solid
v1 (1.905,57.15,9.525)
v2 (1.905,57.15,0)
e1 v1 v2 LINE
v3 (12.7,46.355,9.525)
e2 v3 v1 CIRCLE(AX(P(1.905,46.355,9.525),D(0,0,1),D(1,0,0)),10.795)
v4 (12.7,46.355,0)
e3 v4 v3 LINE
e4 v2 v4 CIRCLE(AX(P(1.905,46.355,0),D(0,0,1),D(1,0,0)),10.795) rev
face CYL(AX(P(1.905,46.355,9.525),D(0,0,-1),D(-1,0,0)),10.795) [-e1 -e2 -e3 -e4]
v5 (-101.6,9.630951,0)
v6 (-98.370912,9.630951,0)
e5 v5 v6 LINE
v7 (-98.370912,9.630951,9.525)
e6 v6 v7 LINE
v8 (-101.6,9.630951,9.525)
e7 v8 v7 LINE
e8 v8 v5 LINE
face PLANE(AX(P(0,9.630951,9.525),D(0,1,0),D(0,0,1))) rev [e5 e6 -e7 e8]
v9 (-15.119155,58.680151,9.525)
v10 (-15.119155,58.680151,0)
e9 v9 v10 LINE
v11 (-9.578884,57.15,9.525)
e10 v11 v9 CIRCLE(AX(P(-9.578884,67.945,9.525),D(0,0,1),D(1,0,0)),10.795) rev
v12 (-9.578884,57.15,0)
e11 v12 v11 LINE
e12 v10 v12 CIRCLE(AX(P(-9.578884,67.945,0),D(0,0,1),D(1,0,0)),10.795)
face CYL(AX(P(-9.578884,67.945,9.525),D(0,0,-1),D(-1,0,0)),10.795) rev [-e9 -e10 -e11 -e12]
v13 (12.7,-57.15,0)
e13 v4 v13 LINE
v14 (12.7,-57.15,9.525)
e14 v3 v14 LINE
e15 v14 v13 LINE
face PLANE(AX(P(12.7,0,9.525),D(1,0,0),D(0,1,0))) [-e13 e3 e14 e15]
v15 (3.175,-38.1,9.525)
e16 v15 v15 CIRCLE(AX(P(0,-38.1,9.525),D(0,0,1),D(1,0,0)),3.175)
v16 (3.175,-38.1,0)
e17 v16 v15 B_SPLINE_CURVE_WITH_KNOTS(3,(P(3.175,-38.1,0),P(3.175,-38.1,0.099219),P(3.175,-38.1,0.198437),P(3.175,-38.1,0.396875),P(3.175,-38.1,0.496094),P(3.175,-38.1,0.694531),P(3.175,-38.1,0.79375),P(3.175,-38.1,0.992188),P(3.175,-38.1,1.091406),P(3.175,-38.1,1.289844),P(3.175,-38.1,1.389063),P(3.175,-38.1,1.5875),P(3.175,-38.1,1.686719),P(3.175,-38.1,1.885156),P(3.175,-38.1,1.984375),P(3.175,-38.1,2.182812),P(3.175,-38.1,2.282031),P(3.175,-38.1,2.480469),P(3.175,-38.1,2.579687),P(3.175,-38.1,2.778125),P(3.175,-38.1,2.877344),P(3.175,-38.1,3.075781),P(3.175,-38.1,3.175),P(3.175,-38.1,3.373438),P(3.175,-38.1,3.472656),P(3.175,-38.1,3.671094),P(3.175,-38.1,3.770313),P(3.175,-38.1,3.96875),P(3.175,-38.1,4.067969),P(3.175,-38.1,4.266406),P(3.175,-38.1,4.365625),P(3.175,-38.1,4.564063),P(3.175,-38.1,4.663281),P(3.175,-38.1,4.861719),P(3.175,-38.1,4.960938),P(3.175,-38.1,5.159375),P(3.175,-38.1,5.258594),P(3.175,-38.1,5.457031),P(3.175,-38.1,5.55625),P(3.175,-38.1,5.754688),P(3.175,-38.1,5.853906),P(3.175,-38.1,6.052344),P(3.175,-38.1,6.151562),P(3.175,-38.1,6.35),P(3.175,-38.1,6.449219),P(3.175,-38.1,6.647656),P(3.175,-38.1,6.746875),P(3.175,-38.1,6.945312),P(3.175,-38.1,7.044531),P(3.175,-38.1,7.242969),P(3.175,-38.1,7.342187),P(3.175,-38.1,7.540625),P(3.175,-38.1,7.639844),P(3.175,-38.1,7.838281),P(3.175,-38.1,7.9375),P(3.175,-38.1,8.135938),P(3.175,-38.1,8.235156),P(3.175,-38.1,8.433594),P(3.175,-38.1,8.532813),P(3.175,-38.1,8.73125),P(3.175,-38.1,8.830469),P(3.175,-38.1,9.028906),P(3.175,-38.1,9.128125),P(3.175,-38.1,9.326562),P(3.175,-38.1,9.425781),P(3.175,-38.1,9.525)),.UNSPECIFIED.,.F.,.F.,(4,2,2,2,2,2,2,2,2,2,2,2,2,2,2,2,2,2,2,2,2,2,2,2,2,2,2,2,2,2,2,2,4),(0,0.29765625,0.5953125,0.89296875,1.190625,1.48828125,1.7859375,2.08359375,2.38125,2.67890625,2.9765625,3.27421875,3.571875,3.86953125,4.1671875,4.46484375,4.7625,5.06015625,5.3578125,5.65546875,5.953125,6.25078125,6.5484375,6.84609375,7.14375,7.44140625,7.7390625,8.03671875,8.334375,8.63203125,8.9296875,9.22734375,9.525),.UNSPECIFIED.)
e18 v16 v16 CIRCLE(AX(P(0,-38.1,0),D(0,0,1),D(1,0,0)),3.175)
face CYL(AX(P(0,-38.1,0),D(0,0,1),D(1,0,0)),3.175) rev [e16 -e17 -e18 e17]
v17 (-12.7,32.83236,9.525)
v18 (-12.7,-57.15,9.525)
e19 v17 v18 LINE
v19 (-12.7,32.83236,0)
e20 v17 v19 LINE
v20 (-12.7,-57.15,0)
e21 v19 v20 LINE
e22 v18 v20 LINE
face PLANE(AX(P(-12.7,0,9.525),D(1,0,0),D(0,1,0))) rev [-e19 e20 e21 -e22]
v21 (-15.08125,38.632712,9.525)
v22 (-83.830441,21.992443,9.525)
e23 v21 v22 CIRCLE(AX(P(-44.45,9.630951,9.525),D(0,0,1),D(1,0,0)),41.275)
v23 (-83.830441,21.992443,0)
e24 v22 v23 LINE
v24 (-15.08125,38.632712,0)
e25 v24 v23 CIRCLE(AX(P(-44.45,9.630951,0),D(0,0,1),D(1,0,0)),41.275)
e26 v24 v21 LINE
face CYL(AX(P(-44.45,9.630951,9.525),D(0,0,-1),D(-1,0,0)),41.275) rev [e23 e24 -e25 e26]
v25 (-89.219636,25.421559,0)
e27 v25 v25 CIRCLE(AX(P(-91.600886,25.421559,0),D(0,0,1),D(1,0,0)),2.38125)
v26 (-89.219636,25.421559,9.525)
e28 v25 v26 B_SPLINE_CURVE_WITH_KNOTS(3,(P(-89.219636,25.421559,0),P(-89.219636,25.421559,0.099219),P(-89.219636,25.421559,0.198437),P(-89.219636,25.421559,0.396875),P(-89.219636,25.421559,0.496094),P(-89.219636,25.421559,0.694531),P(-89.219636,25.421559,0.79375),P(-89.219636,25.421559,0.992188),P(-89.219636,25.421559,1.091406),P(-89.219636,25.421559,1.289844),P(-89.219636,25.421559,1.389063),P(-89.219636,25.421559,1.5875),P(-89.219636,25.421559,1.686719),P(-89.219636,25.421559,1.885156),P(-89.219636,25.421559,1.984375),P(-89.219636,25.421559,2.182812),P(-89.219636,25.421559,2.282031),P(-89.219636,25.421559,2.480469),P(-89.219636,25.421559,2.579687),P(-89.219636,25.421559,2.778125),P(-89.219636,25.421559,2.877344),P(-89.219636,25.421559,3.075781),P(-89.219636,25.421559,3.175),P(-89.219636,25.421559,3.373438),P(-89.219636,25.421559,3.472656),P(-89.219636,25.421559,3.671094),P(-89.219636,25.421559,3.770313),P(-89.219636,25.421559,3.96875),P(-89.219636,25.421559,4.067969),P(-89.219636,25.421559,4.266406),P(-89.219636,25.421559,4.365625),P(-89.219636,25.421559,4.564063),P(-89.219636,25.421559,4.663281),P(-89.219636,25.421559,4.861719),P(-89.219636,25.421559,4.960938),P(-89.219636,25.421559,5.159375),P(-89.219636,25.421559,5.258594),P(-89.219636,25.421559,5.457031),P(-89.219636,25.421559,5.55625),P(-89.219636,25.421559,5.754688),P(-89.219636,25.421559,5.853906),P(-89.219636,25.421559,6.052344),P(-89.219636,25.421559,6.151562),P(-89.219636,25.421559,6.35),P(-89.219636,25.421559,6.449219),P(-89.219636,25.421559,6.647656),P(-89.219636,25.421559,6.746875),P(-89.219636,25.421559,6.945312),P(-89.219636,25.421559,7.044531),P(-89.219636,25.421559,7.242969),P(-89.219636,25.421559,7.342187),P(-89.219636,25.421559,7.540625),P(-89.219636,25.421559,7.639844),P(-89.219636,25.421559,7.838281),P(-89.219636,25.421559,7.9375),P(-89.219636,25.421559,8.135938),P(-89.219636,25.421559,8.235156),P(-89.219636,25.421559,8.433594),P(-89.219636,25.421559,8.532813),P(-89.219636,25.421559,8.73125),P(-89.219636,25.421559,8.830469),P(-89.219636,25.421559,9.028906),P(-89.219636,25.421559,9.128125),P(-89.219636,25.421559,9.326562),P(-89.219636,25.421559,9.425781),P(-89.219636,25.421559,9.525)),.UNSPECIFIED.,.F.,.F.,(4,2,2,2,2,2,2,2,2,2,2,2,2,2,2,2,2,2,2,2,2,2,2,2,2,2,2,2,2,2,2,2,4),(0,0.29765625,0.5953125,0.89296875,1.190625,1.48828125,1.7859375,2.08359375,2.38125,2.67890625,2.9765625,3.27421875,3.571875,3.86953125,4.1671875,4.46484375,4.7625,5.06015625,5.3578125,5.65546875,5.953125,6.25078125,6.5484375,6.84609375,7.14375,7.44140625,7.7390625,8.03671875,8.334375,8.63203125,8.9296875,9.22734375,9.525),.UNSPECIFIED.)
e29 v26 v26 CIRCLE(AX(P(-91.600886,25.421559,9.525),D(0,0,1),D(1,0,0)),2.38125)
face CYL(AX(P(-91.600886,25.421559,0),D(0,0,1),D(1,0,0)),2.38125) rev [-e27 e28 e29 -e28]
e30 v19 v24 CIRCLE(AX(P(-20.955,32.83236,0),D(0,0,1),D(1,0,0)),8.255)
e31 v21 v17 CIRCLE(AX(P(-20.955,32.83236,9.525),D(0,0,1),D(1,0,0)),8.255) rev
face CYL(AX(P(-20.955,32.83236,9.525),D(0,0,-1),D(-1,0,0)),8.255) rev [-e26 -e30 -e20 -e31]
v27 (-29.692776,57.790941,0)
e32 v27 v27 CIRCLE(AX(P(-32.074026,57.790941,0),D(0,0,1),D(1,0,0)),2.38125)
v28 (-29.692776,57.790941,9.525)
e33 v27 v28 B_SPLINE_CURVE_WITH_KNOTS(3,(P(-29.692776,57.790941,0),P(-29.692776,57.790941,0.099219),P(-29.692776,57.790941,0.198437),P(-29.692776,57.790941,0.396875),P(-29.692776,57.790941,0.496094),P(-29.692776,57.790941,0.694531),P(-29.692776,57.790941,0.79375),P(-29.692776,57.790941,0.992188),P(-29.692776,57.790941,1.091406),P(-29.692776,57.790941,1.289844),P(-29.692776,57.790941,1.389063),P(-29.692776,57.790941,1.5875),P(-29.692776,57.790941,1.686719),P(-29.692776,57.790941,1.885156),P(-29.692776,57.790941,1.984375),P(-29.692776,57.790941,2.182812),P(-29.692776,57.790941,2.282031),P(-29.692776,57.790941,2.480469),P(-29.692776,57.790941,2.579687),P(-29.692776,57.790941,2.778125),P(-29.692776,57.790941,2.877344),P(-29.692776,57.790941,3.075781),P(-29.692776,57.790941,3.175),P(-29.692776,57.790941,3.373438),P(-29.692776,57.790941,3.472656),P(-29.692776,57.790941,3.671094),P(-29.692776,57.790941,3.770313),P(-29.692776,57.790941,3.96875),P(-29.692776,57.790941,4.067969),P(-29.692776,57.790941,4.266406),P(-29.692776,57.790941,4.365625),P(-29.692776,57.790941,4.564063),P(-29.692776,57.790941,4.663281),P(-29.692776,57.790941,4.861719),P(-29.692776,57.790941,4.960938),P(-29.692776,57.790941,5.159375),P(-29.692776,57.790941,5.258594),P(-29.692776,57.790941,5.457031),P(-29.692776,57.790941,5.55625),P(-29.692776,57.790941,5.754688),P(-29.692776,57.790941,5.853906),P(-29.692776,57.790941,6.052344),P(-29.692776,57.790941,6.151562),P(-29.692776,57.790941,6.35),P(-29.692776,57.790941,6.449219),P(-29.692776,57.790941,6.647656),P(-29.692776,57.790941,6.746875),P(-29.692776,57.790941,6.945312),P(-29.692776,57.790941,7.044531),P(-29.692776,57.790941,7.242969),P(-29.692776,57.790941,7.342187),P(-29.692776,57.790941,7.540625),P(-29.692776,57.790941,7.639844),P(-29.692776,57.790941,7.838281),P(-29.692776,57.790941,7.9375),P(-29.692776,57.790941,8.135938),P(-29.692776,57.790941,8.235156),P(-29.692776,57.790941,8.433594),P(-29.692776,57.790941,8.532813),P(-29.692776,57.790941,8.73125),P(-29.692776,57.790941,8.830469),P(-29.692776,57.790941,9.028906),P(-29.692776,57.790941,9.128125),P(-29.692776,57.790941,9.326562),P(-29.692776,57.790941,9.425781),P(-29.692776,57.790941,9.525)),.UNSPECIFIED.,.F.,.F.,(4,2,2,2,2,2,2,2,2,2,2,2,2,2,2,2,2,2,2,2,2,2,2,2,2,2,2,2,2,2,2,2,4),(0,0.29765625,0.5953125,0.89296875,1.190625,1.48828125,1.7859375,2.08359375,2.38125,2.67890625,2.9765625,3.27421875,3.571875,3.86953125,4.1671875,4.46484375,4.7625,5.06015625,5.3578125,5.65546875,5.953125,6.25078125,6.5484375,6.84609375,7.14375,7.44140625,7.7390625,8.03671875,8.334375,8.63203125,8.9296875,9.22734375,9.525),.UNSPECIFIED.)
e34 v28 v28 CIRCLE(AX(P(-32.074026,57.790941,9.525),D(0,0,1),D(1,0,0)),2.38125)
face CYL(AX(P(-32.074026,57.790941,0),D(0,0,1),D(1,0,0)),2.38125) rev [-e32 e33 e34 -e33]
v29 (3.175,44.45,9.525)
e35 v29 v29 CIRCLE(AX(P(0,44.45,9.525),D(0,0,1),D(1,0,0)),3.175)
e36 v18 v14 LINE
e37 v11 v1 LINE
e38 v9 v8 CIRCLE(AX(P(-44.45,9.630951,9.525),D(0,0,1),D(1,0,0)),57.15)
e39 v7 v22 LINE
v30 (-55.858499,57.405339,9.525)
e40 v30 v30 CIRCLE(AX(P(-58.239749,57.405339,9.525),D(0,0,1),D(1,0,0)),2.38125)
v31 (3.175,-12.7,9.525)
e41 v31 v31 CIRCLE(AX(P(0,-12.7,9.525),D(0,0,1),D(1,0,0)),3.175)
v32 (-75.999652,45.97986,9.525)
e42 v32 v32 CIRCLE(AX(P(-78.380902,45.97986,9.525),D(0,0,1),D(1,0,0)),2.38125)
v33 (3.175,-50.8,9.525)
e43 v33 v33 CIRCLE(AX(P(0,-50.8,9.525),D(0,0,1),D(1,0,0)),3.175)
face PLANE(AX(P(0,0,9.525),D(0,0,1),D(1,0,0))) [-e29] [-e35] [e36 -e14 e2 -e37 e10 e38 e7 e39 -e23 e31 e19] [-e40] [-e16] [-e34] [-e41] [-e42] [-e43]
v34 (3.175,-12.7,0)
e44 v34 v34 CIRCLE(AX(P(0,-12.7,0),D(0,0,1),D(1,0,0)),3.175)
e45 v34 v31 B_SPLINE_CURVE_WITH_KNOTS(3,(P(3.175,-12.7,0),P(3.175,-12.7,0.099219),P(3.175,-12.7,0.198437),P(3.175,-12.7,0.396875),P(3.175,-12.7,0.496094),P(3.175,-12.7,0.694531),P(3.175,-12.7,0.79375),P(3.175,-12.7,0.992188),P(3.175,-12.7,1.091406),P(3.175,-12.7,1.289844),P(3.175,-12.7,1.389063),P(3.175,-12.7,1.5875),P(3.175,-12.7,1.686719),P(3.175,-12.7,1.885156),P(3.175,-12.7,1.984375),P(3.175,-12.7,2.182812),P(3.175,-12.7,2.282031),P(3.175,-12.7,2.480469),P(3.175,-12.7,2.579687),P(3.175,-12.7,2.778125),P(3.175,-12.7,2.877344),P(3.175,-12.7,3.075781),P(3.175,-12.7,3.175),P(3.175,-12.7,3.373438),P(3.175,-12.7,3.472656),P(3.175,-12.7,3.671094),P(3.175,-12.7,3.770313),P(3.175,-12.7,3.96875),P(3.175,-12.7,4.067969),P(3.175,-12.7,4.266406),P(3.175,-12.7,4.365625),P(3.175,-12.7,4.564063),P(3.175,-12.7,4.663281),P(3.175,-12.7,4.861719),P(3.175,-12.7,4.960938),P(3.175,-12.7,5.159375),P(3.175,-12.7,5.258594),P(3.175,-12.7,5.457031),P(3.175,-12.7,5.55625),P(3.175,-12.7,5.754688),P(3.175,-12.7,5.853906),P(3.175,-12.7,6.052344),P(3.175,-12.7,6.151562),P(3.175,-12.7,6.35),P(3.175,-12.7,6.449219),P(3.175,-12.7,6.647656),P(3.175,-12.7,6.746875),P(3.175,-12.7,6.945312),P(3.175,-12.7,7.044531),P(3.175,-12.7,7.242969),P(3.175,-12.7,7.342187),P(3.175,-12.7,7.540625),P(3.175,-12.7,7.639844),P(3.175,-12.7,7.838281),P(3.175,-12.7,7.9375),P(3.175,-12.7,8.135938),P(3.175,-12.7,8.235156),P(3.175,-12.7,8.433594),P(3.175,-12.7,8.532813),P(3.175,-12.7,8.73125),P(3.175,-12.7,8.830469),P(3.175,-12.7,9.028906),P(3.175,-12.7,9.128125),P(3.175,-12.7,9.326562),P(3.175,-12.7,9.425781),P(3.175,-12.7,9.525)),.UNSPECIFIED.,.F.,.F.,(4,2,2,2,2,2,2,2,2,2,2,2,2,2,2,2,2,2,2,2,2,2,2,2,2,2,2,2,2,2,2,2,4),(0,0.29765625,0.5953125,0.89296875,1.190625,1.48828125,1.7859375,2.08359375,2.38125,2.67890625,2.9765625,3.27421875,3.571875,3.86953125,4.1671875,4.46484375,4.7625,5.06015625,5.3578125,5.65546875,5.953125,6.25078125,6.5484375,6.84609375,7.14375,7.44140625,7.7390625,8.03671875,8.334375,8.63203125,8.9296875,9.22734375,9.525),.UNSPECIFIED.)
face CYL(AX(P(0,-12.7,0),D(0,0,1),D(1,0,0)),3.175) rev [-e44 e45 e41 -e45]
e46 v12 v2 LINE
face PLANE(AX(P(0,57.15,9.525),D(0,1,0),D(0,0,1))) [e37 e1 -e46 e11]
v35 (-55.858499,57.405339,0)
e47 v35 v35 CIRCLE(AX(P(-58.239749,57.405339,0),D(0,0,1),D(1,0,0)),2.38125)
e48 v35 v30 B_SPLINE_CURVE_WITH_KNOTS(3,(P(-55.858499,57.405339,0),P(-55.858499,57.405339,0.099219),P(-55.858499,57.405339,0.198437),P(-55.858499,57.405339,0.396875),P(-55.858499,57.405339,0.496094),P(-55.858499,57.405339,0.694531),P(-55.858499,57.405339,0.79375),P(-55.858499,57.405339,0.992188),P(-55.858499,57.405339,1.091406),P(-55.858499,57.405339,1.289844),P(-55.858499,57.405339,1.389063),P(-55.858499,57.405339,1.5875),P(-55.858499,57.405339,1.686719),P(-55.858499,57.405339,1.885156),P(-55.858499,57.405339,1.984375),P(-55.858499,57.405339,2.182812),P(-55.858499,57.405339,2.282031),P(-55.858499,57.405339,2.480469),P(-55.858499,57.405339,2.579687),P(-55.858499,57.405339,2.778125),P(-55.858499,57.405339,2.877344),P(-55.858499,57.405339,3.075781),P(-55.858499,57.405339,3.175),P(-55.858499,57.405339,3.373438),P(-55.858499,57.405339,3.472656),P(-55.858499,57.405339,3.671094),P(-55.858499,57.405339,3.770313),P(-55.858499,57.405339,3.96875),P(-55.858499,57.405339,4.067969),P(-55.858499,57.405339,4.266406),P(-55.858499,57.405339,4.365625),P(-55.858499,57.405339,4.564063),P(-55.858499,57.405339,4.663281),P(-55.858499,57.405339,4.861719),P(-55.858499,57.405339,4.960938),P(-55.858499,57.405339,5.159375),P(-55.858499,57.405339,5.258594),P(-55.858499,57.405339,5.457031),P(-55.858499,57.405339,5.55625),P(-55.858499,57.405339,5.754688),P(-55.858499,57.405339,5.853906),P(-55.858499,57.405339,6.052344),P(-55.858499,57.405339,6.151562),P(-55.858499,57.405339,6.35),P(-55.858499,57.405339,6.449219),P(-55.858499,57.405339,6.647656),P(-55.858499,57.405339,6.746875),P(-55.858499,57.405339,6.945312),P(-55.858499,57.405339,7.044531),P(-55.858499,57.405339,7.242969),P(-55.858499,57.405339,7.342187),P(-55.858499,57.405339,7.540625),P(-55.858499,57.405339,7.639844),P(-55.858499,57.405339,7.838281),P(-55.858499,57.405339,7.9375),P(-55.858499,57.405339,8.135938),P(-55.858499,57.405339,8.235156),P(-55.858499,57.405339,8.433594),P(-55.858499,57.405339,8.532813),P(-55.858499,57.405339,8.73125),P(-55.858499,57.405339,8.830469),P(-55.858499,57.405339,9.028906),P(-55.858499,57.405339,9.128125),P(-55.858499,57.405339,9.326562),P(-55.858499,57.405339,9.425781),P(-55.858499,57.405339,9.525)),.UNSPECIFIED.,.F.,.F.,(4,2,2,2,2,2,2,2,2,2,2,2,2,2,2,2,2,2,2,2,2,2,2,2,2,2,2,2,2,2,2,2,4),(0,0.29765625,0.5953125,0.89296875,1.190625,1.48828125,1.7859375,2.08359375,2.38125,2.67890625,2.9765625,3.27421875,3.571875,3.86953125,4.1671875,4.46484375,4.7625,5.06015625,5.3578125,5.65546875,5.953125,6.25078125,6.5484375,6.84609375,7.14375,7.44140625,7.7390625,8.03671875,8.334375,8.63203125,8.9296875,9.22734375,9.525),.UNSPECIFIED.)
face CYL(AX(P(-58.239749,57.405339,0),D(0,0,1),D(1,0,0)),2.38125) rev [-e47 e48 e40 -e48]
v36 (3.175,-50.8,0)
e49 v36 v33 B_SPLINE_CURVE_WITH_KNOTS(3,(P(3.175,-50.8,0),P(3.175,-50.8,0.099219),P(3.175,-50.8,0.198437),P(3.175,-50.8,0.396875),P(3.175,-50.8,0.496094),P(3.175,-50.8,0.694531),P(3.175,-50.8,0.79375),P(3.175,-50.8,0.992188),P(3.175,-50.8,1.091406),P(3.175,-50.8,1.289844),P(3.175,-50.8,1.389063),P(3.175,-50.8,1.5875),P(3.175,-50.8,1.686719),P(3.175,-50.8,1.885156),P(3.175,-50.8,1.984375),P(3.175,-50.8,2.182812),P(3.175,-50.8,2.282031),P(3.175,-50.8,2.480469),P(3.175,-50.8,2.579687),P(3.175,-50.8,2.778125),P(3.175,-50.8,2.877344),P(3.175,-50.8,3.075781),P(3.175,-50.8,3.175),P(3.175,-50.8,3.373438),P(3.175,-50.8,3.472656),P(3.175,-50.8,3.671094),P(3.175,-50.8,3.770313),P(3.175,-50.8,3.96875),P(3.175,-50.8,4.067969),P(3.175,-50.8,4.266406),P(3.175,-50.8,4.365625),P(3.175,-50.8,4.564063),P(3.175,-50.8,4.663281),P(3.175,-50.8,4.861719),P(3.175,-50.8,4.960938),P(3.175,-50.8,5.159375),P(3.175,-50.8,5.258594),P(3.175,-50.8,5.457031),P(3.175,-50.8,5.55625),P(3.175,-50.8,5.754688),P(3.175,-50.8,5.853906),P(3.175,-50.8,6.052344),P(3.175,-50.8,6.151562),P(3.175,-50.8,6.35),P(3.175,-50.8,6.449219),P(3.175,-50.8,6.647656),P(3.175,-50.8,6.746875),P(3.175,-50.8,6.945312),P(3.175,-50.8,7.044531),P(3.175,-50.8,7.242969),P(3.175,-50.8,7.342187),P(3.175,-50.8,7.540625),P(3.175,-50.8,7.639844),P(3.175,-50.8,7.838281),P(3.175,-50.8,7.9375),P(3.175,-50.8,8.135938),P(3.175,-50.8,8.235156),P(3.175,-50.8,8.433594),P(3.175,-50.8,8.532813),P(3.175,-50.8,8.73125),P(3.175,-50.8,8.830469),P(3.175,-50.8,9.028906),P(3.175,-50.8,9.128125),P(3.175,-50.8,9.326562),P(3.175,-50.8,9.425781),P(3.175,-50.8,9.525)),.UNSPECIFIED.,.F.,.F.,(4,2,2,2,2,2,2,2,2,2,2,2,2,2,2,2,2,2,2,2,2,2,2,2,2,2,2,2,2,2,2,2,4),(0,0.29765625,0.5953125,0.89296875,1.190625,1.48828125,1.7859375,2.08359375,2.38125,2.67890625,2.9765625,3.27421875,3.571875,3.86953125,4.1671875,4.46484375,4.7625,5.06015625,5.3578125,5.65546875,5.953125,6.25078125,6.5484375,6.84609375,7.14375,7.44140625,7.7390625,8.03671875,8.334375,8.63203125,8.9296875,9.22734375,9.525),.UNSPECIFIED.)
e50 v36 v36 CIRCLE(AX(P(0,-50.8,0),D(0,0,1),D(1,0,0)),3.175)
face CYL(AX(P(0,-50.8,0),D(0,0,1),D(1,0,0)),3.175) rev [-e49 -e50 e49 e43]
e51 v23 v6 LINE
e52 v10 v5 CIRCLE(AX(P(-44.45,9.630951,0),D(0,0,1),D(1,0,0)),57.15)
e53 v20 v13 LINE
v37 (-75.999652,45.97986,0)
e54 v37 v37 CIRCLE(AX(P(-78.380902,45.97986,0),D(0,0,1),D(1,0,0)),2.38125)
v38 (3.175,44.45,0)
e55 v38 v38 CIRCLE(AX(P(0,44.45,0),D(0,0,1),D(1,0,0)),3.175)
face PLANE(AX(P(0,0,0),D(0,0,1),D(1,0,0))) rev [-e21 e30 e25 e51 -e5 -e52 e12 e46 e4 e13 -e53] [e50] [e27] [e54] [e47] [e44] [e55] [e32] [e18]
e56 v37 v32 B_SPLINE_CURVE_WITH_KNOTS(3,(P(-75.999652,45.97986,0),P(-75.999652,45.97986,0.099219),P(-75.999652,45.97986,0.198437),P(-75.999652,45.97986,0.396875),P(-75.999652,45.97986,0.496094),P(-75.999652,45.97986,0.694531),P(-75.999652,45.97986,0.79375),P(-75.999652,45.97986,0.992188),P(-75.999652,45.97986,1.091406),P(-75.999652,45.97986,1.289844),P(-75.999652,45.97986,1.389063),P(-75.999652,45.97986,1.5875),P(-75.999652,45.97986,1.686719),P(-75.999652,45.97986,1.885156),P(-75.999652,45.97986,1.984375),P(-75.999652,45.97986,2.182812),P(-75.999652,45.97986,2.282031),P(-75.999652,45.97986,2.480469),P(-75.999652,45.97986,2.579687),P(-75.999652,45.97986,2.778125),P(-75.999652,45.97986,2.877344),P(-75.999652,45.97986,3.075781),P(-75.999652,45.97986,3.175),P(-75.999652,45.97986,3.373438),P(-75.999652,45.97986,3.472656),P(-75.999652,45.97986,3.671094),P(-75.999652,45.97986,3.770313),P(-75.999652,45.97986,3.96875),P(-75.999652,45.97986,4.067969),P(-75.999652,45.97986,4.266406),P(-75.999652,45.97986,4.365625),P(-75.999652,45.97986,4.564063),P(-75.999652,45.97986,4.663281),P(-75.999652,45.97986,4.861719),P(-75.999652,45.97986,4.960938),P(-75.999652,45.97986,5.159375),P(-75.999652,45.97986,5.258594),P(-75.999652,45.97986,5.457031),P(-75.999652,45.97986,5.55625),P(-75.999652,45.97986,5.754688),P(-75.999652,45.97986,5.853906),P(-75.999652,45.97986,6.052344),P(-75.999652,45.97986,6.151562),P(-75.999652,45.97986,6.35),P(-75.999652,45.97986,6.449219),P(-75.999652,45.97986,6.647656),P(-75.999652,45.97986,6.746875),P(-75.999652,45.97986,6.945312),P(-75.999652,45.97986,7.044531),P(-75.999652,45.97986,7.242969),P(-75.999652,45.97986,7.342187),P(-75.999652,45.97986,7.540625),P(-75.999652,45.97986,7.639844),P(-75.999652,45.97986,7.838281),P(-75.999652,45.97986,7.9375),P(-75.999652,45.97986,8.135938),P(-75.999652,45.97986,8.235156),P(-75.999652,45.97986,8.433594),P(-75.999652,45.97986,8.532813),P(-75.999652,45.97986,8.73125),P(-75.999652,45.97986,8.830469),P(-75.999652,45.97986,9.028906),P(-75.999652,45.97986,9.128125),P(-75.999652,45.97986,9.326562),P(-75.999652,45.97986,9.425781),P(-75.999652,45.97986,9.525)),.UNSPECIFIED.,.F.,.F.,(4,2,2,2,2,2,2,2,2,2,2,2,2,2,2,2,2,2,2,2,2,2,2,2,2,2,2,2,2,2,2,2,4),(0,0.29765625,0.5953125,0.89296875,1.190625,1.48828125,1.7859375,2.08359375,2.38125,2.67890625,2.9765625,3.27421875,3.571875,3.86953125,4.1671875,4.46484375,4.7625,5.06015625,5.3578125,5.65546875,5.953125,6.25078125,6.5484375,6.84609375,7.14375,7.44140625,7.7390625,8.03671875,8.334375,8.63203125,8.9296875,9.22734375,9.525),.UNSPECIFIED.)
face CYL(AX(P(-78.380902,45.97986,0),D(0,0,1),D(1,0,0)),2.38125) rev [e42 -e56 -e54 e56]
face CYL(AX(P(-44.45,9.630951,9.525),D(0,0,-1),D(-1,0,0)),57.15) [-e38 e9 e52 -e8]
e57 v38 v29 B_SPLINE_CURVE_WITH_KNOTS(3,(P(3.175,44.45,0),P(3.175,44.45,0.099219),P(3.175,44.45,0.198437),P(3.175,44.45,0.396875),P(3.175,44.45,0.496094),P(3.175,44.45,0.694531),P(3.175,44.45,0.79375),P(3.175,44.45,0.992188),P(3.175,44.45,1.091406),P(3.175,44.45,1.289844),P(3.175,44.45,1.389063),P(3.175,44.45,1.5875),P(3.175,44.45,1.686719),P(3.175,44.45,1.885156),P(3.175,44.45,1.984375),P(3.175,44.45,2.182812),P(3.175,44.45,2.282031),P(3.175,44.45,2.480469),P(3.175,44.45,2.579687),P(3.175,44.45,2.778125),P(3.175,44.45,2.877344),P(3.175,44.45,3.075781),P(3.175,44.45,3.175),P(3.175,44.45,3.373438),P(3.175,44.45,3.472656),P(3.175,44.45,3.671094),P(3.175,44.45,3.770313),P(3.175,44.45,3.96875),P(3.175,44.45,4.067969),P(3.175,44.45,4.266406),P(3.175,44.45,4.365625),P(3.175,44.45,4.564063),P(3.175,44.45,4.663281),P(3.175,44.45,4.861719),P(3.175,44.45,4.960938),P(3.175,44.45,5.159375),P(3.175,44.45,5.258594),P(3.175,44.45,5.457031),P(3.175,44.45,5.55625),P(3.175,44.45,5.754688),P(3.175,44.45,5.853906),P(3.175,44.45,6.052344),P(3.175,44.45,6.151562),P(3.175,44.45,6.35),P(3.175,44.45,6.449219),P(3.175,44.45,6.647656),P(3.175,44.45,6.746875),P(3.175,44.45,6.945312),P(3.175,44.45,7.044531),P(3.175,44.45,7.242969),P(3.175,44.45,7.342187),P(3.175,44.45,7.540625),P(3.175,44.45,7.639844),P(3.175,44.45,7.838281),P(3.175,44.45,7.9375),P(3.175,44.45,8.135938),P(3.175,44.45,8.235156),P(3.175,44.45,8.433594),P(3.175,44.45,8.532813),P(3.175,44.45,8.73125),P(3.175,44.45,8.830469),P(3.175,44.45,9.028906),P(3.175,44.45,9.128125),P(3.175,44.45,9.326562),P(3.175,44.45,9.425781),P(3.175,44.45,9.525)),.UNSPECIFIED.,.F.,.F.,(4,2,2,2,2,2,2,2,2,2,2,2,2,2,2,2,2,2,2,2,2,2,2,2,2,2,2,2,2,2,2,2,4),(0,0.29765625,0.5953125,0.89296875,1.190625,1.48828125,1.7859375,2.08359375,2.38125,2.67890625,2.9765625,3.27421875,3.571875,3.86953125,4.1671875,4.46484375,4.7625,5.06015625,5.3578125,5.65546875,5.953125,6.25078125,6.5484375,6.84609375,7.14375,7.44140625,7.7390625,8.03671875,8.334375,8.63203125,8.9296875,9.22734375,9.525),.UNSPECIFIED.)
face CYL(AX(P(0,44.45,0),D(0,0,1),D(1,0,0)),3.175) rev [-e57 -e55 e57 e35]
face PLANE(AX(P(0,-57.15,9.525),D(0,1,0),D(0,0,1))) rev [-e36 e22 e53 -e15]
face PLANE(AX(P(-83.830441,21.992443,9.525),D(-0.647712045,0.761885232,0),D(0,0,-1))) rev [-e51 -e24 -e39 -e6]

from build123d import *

# Parameters (mm, degrees)
BOSS_EXTRUDE1_DEPTH = 9.525
FILLET1_R           = 8.255
FILLET3_R           = 10.795
SKETCH2_R           = 3.175
CUT_EXTRUDE1_DEPTH  = 122.954832076
SKETCH3_R           = 3.175
SKETCH3_R_2         = 2.38125
CUT_EXTRUDE2_DEPTH  = 122.954832076


with BuildPart() as part:
    # Sketch1 → Boss-Extrude1 (new body)
    with BuildSketch(Plane.XY):
        with BuildLine():
            Line((12.7, 57.15), (-12.7, 57.15))
            ThreePointArc((-12.7, 57.15), (-71.390768363, 60.032513664), (-101.6, 9.630951188))
            Line((-101.6, 9.630951188), (-85.725, 9.630951188))
            ThreePointArc((-85.725, 9.630951188), (-58.470420375, 48.45173734), (-12.7, 36.004481953))
            Line((-12.7, 36.004481953), (-12.7, -57.15))
            Line((-12.7, -57.15), (12.7, -57.15))
            Line((12.7, -57.15), (12.7, 57.15))
        make_face()
    extrude(amount=BOSS_EXTRUDE1_DEPTH)

    # Fillet1
    fillet1_edges = [part.edges().sort_by_distance(p)[0] for p in [
        (-12.7, 36.004481953, 4.7625),
    ]]
    fillet(fillet1_edges, radius=FILLET1_R)

    # Chamfer1
    # the kernel refuses this chamfer: 16.925734726, 15.24 mm, written as the material it takes off along each edge
    with BuildSketch(Plane(origin=(-85.725, 9.630951188, -32.922584323), x_dir=(0.18505799374320953, 0.982727601602671, 0), z_dir=(0, 0, 1))) as chamfer1_piece_1:
        with BuildLine():
            Line((13.024984464, 0), (-2.866629235, 12.853244189))
            Line((-2.866629235, 12.853244189), (-3.199296969, 12.790599339))
            ThreePointArc((-3.199296969, 12.790599339), (-1.550509453, 6.404553068), (-0.332667734, -0.06264485))
            Line((-0.332667734, -0.06264485), (0.06264485, -0.332667734))
            ThreePointArc((0.06264485, -0.332667734), (6.502538231, 0.358645822), (12.985122864, -0.336159562))
            Line((12.985122864, -0.336159562), (13.024984464, 0))
        make_face()
    extrude(amount=75.370168646, mode=Mode.SUBTRACT)

    # Fillet3
    fillet3_edges = [part.edges().sort_by_distance(p)[0] for p in [
        (-12.7, 57.15, 4.7625),
        (12.7, 57.15, 4.7625),
    ]]
    fillet(fillet3_edges, radius=FILLET3_R)

    # Sketch2 → Cut-Extrude1 (cut, through all)
    with BuildSketch(Plane.XY.offset(9.525)):
        with Locations((0, -50.8)):
            Circle(SKETCH2_R)
        with Locations((0, -38.1)):
            Circle(SKETCH2_R)
    extrude(amount=-CUT_EXTRUDE1_DEPTH, mode=Mode.SUBTRACT)

    # Sketch3 → Cut-Extrude2 (cut, through all)
    with BuildSketch(Plane.XY.offset(9.525)):
        with Locations((0, -12.7)):
            Circle(SKETCH3_R)
        with Locations((0, 44.45)):
            Circle(SKETCH3_R)
        with Locations((-91.600885684, 25.42155909)):
            Circle(SKETCH3_R_2)
        with Locations((-78.380902496, 45.979860037)):
            Circle(SKETCH3_R_2)
        with Locations((-58.239749026, 57.405339102)):
            Circle(SKETCH3_R_2)
        with Locations((-32.074025979, 57.790940658)):
            Circle(SKETCH3_R_2)
    extrude(amount=-CUT_EXTRUDE2_DEPTH, mode=Mode.SUBTRACT)


solid = part.part
